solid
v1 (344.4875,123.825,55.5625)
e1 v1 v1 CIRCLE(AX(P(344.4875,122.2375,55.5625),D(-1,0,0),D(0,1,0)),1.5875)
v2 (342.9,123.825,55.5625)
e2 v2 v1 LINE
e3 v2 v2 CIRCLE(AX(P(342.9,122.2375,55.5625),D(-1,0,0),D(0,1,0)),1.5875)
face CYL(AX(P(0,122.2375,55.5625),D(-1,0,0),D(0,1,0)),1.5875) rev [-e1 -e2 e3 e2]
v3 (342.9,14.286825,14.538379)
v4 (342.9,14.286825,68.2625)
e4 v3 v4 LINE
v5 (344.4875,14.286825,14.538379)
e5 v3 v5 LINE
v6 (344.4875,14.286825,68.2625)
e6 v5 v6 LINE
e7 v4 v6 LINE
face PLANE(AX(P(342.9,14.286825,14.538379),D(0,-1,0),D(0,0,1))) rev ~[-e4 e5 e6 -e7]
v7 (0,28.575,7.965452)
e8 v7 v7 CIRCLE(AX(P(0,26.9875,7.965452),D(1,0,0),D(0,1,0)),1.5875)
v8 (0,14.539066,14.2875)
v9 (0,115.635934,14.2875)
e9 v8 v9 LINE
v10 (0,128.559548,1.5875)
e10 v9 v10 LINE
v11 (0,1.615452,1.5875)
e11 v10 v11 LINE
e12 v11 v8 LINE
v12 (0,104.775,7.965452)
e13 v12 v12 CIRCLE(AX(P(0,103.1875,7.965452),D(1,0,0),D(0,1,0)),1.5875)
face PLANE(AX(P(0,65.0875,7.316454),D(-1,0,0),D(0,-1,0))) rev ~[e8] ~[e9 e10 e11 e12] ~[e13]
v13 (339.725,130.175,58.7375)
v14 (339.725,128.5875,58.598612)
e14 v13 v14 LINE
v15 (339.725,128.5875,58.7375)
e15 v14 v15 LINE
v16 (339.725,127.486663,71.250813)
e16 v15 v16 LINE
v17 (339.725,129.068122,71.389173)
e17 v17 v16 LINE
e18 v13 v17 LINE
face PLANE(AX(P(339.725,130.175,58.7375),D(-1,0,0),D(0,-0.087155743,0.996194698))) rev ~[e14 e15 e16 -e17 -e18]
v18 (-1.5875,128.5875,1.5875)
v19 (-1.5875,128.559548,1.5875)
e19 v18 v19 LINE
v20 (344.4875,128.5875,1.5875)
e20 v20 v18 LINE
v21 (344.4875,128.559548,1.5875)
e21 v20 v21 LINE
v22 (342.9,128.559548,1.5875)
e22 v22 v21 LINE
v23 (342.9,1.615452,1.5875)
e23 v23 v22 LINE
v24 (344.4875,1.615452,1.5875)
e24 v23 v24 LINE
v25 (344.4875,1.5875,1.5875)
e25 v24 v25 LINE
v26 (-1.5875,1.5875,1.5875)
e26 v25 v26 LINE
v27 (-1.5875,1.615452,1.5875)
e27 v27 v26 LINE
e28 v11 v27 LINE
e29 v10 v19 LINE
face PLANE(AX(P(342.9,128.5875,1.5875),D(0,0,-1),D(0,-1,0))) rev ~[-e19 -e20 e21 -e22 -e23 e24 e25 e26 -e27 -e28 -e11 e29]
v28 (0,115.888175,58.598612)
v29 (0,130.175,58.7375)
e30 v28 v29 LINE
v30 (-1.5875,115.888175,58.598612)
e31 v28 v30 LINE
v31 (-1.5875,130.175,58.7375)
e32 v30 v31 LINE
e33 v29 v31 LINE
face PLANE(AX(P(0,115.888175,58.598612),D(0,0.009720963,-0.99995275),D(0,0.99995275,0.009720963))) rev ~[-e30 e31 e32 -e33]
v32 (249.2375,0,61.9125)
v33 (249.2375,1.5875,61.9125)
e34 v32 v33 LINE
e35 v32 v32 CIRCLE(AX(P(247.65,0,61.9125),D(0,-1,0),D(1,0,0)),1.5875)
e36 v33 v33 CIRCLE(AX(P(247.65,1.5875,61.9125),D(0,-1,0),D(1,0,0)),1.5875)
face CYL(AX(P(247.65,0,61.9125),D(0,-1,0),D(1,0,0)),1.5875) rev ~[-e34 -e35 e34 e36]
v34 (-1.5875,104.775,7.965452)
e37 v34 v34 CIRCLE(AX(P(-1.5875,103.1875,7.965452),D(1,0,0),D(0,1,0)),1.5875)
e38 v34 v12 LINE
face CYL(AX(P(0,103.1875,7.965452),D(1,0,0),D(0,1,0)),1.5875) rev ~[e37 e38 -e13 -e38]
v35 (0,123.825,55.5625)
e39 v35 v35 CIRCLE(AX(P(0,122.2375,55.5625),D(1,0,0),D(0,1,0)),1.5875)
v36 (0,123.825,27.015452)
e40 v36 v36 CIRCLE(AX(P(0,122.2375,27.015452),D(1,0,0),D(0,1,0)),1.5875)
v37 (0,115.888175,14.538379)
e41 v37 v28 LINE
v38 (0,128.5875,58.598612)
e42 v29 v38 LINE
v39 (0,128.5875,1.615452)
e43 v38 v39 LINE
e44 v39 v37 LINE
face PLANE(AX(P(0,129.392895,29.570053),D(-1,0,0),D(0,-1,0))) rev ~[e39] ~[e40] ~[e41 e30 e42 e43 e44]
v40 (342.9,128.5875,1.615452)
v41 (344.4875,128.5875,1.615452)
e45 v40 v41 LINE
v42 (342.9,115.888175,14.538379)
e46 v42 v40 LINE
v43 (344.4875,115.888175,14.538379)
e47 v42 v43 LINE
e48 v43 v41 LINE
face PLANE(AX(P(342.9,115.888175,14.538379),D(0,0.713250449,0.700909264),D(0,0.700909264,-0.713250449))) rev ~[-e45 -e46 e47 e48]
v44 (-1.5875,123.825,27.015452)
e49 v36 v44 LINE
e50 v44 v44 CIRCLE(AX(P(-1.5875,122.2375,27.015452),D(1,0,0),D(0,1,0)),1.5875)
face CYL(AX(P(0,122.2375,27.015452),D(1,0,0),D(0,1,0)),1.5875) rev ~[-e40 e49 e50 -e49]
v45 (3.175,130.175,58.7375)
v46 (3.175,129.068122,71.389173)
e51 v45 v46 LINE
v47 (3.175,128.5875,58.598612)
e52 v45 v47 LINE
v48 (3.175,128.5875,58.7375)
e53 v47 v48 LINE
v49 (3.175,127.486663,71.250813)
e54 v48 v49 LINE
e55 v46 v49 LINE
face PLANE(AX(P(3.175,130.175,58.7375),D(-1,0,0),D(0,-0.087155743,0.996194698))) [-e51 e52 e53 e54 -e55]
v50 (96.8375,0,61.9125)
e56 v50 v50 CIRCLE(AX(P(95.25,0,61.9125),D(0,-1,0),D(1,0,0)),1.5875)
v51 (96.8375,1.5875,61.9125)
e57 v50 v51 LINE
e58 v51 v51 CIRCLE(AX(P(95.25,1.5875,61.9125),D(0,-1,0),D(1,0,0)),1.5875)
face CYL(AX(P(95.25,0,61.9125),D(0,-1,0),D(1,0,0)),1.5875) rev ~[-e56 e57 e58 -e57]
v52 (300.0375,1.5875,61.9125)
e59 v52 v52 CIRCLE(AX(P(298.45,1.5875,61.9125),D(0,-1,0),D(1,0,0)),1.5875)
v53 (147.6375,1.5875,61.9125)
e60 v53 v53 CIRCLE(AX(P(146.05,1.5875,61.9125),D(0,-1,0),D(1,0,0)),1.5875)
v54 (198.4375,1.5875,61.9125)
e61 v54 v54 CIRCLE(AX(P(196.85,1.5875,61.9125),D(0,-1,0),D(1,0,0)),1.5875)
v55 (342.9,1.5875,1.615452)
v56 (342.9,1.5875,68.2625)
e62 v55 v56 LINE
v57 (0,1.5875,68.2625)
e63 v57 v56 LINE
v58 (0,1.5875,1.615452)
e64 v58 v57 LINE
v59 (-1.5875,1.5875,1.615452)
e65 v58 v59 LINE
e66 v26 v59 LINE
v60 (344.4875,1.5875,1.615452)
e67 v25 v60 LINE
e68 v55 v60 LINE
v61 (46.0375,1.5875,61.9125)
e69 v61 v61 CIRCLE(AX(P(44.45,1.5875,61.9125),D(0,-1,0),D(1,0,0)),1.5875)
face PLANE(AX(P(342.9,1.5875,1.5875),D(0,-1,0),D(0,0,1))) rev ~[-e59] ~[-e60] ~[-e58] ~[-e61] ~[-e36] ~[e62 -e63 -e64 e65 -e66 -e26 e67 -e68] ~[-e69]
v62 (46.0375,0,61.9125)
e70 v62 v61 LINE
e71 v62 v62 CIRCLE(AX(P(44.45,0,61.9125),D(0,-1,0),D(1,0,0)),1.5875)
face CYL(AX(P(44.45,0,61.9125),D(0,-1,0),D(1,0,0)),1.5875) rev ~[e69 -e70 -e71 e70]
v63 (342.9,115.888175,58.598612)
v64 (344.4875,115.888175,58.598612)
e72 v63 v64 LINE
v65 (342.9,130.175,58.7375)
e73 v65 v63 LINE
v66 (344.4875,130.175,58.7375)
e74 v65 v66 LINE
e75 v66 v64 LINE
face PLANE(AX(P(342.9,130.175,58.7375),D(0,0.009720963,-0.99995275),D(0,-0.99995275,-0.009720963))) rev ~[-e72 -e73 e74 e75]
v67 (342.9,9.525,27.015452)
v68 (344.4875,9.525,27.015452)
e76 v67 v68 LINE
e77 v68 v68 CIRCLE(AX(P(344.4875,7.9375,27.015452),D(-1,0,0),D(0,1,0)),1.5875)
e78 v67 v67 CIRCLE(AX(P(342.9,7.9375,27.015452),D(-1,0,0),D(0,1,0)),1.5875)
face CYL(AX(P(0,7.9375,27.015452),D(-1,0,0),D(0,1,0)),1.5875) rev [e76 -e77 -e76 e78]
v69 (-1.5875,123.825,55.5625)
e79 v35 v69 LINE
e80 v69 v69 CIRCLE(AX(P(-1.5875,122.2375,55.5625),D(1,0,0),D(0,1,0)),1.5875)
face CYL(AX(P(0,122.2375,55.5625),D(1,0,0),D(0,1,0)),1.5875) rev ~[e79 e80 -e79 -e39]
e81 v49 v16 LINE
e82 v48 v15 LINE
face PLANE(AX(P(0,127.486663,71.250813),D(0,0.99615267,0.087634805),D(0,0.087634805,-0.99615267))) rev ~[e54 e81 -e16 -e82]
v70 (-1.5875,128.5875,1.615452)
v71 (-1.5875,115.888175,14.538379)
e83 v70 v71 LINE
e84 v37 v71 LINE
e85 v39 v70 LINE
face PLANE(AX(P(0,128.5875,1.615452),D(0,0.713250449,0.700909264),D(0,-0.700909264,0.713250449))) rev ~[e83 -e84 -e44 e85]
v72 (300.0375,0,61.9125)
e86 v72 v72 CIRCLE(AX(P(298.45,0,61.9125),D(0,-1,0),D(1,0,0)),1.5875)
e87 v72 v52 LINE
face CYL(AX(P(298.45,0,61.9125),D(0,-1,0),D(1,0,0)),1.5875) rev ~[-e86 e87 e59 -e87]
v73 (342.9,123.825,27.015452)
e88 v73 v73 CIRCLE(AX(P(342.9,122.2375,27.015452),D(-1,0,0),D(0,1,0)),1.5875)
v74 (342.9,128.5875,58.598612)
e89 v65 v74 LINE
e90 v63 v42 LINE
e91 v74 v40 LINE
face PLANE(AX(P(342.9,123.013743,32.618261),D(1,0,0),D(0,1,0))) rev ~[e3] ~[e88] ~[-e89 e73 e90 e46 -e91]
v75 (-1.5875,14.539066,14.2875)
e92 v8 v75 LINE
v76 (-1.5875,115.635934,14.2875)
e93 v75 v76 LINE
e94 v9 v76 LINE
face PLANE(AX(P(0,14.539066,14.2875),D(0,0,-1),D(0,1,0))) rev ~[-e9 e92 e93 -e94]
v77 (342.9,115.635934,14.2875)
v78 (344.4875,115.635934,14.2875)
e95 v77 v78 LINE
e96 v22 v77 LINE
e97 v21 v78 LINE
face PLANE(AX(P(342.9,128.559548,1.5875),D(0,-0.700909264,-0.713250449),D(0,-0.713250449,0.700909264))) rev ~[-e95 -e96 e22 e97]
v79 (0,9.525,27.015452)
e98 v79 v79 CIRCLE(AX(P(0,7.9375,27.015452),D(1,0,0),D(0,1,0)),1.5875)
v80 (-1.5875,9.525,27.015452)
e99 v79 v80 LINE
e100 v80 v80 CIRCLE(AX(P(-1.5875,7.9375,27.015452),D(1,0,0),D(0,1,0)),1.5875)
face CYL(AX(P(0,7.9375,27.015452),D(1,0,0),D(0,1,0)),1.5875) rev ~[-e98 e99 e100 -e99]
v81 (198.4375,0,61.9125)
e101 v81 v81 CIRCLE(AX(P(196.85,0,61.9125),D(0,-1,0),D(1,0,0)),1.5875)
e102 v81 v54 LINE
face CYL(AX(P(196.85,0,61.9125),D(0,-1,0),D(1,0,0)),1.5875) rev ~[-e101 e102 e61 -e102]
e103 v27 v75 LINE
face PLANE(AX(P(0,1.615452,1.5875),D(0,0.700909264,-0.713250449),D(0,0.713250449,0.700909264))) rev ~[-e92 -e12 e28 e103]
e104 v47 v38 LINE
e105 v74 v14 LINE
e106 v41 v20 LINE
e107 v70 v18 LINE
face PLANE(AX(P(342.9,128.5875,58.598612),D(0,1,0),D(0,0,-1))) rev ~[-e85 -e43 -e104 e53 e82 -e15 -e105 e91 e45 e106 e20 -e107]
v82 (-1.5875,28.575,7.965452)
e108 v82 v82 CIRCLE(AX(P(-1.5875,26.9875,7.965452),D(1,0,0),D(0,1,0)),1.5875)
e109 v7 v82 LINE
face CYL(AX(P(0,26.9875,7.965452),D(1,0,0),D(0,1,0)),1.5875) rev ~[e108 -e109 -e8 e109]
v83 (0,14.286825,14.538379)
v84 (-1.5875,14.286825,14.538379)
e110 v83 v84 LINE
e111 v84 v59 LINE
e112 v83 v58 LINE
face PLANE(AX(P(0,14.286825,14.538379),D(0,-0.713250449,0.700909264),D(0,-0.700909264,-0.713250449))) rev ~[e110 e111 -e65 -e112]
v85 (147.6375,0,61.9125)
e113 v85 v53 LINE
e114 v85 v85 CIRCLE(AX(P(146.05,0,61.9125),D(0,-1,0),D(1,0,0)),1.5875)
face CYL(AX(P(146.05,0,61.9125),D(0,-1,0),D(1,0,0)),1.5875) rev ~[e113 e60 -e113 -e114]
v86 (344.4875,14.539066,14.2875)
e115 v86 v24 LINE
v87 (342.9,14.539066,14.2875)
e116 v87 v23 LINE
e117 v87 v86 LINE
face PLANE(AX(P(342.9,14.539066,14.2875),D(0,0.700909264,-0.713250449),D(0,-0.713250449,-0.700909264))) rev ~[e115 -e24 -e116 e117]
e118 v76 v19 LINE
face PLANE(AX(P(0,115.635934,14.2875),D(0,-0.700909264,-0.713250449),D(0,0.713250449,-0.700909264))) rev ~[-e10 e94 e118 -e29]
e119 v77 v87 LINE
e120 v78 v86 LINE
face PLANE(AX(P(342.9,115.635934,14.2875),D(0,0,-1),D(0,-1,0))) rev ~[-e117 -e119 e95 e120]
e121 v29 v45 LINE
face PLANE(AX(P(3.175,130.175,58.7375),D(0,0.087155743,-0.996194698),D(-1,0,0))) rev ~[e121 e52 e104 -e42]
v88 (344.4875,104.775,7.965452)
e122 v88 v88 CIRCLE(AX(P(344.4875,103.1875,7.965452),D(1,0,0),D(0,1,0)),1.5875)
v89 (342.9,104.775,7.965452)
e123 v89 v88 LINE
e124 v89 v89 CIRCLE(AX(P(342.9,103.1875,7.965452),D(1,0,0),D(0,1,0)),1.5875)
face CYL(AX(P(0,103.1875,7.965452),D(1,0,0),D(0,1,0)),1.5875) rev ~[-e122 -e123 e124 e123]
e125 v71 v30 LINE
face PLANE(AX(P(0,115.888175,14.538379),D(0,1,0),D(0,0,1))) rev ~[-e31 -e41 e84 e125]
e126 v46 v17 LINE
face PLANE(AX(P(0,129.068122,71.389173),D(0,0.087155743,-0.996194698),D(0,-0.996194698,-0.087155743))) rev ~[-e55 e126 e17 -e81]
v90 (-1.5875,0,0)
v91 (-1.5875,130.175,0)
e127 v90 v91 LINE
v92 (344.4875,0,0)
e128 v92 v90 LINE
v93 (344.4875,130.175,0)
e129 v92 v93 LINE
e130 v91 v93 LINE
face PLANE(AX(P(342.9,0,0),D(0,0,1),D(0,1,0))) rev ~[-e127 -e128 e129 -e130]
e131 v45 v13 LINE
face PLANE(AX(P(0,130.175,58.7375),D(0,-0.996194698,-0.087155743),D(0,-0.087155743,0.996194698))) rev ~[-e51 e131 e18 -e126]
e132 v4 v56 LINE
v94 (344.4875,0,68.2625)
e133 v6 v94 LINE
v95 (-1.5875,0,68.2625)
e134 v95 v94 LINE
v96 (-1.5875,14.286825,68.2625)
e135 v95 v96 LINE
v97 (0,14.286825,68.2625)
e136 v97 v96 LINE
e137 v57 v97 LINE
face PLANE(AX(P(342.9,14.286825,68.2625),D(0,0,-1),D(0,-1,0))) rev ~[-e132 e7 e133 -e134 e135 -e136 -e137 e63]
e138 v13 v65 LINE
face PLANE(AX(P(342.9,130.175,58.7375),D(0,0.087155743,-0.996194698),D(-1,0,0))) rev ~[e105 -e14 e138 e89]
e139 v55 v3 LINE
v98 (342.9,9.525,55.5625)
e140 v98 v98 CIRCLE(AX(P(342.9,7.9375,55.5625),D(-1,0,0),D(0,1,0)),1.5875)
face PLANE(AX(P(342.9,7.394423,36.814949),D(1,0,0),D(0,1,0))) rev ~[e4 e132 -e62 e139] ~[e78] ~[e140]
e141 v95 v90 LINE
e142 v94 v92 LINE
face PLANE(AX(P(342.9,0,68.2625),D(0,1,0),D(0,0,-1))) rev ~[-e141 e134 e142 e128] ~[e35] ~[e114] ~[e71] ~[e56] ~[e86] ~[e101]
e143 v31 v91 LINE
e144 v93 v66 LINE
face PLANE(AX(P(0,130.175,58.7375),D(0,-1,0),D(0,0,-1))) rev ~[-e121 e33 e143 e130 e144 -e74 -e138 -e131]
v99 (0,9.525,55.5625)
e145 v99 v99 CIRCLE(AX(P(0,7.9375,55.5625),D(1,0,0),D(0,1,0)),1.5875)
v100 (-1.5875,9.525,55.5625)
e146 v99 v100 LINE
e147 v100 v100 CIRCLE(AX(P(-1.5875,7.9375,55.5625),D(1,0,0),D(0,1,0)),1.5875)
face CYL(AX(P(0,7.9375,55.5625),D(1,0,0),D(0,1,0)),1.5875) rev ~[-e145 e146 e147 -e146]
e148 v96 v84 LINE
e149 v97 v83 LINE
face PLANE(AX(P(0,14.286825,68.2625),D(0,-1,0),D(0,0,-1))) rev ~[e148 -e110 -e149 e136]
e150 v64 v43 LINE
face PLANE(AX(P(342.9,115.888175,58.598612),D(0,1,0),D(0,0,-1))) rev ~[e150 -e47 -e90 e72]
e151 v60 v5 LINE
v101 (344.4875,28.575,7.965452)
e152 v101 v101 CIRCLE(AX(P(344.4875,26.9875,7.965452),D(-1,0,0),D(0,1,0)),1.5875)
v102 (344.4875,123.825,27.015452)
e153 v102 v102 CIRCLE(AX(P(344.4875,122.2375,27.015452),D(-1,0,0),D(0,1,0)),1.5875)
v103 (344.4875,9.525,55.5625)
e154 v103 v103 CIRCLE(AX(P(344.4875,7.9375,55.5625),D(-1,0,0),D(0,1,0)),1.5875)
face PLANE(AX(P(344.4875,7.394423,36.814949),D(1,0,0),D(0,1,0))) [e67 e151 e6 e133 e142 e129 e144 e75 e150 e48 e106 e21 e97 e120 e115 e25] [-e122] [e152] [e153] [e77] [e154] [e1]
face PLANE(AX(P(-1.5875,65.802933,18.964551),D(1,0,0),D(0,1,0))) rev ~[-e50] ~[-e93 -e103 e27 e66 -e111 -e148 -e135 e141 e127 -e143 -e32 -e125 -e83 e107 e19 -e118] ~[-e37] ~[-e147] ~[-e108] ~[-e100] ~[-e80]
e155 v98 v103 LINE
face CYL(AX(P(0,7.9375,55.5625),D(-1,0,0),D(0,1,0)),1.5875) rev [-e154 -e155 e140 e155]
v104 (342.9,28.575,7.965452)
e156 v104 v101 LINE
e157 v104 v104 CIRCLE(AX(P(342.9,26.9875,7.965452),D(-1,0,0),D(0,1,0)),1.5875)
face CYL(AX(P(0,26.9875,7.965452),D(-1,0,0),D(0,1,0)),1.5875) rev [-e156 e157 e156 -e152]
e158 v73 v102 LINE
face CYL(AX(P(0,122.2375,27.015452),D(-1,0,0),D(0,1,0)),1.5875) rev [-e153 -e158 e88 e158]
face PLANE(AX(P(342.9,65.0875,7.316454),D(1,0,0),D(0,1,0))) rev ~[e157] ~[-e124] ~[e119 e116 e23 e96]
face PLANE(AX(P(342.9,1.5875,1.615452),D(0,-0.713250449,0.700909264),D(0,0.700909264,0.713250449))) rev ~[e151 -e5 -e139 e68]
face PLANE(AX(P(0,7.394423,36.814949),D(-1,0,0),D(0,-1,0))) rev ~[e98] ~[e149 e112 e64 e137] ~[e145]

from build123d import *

# Parameters (mm, degrees)
F1_DEPTH  = 342.9
F2_W      = 3.175
F2_H      = 12.7
F3_DEPTH  = 1.5945639921
F5_DEPTH  = 1.5875
F6_DEPTH  = 1.5875
F10_DEPTH = 1.5875
F11_R     = 1.5875
F12_DEPTH = 444.5
F13_R     = 1.5875
F14_DEPTH = 1.5875


# Not quite as in the source:
# - a feature names something its author has since deleted; it is built from what else it names


with BuildPart() as f1:
    # F0 (on Right) → F1 (new body)
    with BuildSketch(Plane.YZ):
        Polygon((0, 68.2625), (0, 0), (130.175, 0), (130.175, 58.7375), (129.0681220671, 71.3891726658), (127.4866629839, 71.2508129242), (128.5875, 58.7375), (128.5875, 1.5875), (1.5875, 1.5875), (1.5875, 68.2625), align=None)
    extrude(amount=F1_DEPTH)

    # F2 (on face) → F3 (cut, through all)
    with BuildSketch(Plane(origin=(0, 134.286004542, 11.7485030676), x_dir=(-1, 0, 0), z_dir=(0, 0.9961946981, 0.0871557427))):
        with Locations((-341.3125, 53.518487267)):
            Rectangle(F2_W, F2_H)
        with Locations((-1.5875, 53.518487267)):
            Rectangle(F2_W, F2_H)
    extrude(amount=-F3_DEPTH, mode=Mode.SUBTRACT)

    # F4 (on face) → F5 (join)
    with BuildSketch(Plane(origin=(0, 0, 0), x_dir=(0, -1, 0), z_dir=(-1, 0, 0))):
        Polygon((-128.5875, 58.5986117467), (-130.175, 58.7375), (-130.175, 0), (-128.5875, 1.6154517363), align=None)
        Polygon((-115.8881750797, 58.5986117466), (-130.175, 58.7375), (-128.5875, 58.5986117467), (-128.5875, 1.6154517363), (-115.8881750797, 14.538378661), align=None)
        Polygon((-115.6359343729, 14.2875), (-128.5595482637, 1.5875), (-1.6154517363, 1.5875), (-14.5390656271, 14.2875), align=None)
        Polygon((-14.2868249203, 14.538378661), (-1.5875, 1.6154517363), (-1.5875, 68.2625), (-14.2868249203, 68.2625), (-14.2868249203, 58.5986117466), align=None)
    extrude(amount=F5_DEPTH)


with BuildPart() as f6:
    # F6 (new): a face of the model
    f6_faces = [f1.part.faces().sort_by_distance(p)[0] for p in [
        (0, 129.2764111618, 0.7047010288),
    ]]
    extrude(f6_faces, amount=F6_DEPTH)


with BuildPart() as f1_1:
    add(f1.part)

    # F7: union F6
    add(f6.part)

    # F9 (on face) + F8 (on face) → F10 (join)
    with BuildSketch(Plane.YZ.offset(342.9)):
        Polygon((1.5875, 68.2625), (1.5875, 1.6154517363), (14.2868249203, 14.538378661), (14.2868249203, 58.5986117466), (14.2868249203, 68.2625), align=None)
        Polygon((115.8881750797, 14.538378661), (128.5875, 1.6154517363), (128.5875, 58.5986117467), (130.175, 58.7375), (115.8881750797, 58.5986117466), align=None)
        Polygon((128.5875, 1.6154517363), (130.175, 0), (130.175, 58.7375), (128.5875, 58.5986117467), align=None)
        Polygon((14.5390656271, 14.2875), (1.6154517363, 1.5875), (128.5595482637, 1.5875), (115.6359343729, 14.2875), align=None)
    with BuildSketch(Plane.YZ.offset(342.9)):
        Polygon((128.5875, 58.5986117467), (128.5875, 1.5875), (1.5875, 1.5875), (1.5875, 68.2625), (0, 68.2625), (0, 0), (130.175, 0), (130.175, 58.7375), align=None)
    extrude(amount=F10_DEPTH)

    # F11 (on face) → F12 (cut, symmetric)
    with BuildSketch(Plane.YZ):
        with Locations((7.9375, 55.5625)):
            Circle(F11_R)
        with Locations((7.9375, 27.0154517363)):
            Circle(F11_R)
        with Locations((26.9875, 7.9654517363)):
            Circle(F11_R)
        with Locations((122.2375, 55.5625)):
            Circle(F11_R)
        with Locations((122.2375, 27.0154517363)):
            Circle(F11_R)
        with Locations((103.1875, 7.9654517363)):
            Circle(F11_R)
    extrude(amount=F12_DEPTH, both=True, mode=Mode.SUBTRACT)

    # F13 (on face) → F14 (cut, through all)
    with BuildSketch(Plane.XZ):
        with Locations((44.45, 61.9125)):
            Circle(F13_R)
        with Locations((95.25, 61.9125)):
            Circle(F13_R)
        with Locations((146.05, 61.9125)):
            Circle(F13_R)
        with Locations((196.85, 61.9125)):
            Circle(F13_R)
        with Locations((247.65, 61.9125)):
            Circle(F13_R)
        with Locations((298.45, 61.9125)):
            Circle(F13_R)
    extrude(amount=-F14_DEPTH, mode=Mode.SUBTRACT)


solid = f1_1.part
